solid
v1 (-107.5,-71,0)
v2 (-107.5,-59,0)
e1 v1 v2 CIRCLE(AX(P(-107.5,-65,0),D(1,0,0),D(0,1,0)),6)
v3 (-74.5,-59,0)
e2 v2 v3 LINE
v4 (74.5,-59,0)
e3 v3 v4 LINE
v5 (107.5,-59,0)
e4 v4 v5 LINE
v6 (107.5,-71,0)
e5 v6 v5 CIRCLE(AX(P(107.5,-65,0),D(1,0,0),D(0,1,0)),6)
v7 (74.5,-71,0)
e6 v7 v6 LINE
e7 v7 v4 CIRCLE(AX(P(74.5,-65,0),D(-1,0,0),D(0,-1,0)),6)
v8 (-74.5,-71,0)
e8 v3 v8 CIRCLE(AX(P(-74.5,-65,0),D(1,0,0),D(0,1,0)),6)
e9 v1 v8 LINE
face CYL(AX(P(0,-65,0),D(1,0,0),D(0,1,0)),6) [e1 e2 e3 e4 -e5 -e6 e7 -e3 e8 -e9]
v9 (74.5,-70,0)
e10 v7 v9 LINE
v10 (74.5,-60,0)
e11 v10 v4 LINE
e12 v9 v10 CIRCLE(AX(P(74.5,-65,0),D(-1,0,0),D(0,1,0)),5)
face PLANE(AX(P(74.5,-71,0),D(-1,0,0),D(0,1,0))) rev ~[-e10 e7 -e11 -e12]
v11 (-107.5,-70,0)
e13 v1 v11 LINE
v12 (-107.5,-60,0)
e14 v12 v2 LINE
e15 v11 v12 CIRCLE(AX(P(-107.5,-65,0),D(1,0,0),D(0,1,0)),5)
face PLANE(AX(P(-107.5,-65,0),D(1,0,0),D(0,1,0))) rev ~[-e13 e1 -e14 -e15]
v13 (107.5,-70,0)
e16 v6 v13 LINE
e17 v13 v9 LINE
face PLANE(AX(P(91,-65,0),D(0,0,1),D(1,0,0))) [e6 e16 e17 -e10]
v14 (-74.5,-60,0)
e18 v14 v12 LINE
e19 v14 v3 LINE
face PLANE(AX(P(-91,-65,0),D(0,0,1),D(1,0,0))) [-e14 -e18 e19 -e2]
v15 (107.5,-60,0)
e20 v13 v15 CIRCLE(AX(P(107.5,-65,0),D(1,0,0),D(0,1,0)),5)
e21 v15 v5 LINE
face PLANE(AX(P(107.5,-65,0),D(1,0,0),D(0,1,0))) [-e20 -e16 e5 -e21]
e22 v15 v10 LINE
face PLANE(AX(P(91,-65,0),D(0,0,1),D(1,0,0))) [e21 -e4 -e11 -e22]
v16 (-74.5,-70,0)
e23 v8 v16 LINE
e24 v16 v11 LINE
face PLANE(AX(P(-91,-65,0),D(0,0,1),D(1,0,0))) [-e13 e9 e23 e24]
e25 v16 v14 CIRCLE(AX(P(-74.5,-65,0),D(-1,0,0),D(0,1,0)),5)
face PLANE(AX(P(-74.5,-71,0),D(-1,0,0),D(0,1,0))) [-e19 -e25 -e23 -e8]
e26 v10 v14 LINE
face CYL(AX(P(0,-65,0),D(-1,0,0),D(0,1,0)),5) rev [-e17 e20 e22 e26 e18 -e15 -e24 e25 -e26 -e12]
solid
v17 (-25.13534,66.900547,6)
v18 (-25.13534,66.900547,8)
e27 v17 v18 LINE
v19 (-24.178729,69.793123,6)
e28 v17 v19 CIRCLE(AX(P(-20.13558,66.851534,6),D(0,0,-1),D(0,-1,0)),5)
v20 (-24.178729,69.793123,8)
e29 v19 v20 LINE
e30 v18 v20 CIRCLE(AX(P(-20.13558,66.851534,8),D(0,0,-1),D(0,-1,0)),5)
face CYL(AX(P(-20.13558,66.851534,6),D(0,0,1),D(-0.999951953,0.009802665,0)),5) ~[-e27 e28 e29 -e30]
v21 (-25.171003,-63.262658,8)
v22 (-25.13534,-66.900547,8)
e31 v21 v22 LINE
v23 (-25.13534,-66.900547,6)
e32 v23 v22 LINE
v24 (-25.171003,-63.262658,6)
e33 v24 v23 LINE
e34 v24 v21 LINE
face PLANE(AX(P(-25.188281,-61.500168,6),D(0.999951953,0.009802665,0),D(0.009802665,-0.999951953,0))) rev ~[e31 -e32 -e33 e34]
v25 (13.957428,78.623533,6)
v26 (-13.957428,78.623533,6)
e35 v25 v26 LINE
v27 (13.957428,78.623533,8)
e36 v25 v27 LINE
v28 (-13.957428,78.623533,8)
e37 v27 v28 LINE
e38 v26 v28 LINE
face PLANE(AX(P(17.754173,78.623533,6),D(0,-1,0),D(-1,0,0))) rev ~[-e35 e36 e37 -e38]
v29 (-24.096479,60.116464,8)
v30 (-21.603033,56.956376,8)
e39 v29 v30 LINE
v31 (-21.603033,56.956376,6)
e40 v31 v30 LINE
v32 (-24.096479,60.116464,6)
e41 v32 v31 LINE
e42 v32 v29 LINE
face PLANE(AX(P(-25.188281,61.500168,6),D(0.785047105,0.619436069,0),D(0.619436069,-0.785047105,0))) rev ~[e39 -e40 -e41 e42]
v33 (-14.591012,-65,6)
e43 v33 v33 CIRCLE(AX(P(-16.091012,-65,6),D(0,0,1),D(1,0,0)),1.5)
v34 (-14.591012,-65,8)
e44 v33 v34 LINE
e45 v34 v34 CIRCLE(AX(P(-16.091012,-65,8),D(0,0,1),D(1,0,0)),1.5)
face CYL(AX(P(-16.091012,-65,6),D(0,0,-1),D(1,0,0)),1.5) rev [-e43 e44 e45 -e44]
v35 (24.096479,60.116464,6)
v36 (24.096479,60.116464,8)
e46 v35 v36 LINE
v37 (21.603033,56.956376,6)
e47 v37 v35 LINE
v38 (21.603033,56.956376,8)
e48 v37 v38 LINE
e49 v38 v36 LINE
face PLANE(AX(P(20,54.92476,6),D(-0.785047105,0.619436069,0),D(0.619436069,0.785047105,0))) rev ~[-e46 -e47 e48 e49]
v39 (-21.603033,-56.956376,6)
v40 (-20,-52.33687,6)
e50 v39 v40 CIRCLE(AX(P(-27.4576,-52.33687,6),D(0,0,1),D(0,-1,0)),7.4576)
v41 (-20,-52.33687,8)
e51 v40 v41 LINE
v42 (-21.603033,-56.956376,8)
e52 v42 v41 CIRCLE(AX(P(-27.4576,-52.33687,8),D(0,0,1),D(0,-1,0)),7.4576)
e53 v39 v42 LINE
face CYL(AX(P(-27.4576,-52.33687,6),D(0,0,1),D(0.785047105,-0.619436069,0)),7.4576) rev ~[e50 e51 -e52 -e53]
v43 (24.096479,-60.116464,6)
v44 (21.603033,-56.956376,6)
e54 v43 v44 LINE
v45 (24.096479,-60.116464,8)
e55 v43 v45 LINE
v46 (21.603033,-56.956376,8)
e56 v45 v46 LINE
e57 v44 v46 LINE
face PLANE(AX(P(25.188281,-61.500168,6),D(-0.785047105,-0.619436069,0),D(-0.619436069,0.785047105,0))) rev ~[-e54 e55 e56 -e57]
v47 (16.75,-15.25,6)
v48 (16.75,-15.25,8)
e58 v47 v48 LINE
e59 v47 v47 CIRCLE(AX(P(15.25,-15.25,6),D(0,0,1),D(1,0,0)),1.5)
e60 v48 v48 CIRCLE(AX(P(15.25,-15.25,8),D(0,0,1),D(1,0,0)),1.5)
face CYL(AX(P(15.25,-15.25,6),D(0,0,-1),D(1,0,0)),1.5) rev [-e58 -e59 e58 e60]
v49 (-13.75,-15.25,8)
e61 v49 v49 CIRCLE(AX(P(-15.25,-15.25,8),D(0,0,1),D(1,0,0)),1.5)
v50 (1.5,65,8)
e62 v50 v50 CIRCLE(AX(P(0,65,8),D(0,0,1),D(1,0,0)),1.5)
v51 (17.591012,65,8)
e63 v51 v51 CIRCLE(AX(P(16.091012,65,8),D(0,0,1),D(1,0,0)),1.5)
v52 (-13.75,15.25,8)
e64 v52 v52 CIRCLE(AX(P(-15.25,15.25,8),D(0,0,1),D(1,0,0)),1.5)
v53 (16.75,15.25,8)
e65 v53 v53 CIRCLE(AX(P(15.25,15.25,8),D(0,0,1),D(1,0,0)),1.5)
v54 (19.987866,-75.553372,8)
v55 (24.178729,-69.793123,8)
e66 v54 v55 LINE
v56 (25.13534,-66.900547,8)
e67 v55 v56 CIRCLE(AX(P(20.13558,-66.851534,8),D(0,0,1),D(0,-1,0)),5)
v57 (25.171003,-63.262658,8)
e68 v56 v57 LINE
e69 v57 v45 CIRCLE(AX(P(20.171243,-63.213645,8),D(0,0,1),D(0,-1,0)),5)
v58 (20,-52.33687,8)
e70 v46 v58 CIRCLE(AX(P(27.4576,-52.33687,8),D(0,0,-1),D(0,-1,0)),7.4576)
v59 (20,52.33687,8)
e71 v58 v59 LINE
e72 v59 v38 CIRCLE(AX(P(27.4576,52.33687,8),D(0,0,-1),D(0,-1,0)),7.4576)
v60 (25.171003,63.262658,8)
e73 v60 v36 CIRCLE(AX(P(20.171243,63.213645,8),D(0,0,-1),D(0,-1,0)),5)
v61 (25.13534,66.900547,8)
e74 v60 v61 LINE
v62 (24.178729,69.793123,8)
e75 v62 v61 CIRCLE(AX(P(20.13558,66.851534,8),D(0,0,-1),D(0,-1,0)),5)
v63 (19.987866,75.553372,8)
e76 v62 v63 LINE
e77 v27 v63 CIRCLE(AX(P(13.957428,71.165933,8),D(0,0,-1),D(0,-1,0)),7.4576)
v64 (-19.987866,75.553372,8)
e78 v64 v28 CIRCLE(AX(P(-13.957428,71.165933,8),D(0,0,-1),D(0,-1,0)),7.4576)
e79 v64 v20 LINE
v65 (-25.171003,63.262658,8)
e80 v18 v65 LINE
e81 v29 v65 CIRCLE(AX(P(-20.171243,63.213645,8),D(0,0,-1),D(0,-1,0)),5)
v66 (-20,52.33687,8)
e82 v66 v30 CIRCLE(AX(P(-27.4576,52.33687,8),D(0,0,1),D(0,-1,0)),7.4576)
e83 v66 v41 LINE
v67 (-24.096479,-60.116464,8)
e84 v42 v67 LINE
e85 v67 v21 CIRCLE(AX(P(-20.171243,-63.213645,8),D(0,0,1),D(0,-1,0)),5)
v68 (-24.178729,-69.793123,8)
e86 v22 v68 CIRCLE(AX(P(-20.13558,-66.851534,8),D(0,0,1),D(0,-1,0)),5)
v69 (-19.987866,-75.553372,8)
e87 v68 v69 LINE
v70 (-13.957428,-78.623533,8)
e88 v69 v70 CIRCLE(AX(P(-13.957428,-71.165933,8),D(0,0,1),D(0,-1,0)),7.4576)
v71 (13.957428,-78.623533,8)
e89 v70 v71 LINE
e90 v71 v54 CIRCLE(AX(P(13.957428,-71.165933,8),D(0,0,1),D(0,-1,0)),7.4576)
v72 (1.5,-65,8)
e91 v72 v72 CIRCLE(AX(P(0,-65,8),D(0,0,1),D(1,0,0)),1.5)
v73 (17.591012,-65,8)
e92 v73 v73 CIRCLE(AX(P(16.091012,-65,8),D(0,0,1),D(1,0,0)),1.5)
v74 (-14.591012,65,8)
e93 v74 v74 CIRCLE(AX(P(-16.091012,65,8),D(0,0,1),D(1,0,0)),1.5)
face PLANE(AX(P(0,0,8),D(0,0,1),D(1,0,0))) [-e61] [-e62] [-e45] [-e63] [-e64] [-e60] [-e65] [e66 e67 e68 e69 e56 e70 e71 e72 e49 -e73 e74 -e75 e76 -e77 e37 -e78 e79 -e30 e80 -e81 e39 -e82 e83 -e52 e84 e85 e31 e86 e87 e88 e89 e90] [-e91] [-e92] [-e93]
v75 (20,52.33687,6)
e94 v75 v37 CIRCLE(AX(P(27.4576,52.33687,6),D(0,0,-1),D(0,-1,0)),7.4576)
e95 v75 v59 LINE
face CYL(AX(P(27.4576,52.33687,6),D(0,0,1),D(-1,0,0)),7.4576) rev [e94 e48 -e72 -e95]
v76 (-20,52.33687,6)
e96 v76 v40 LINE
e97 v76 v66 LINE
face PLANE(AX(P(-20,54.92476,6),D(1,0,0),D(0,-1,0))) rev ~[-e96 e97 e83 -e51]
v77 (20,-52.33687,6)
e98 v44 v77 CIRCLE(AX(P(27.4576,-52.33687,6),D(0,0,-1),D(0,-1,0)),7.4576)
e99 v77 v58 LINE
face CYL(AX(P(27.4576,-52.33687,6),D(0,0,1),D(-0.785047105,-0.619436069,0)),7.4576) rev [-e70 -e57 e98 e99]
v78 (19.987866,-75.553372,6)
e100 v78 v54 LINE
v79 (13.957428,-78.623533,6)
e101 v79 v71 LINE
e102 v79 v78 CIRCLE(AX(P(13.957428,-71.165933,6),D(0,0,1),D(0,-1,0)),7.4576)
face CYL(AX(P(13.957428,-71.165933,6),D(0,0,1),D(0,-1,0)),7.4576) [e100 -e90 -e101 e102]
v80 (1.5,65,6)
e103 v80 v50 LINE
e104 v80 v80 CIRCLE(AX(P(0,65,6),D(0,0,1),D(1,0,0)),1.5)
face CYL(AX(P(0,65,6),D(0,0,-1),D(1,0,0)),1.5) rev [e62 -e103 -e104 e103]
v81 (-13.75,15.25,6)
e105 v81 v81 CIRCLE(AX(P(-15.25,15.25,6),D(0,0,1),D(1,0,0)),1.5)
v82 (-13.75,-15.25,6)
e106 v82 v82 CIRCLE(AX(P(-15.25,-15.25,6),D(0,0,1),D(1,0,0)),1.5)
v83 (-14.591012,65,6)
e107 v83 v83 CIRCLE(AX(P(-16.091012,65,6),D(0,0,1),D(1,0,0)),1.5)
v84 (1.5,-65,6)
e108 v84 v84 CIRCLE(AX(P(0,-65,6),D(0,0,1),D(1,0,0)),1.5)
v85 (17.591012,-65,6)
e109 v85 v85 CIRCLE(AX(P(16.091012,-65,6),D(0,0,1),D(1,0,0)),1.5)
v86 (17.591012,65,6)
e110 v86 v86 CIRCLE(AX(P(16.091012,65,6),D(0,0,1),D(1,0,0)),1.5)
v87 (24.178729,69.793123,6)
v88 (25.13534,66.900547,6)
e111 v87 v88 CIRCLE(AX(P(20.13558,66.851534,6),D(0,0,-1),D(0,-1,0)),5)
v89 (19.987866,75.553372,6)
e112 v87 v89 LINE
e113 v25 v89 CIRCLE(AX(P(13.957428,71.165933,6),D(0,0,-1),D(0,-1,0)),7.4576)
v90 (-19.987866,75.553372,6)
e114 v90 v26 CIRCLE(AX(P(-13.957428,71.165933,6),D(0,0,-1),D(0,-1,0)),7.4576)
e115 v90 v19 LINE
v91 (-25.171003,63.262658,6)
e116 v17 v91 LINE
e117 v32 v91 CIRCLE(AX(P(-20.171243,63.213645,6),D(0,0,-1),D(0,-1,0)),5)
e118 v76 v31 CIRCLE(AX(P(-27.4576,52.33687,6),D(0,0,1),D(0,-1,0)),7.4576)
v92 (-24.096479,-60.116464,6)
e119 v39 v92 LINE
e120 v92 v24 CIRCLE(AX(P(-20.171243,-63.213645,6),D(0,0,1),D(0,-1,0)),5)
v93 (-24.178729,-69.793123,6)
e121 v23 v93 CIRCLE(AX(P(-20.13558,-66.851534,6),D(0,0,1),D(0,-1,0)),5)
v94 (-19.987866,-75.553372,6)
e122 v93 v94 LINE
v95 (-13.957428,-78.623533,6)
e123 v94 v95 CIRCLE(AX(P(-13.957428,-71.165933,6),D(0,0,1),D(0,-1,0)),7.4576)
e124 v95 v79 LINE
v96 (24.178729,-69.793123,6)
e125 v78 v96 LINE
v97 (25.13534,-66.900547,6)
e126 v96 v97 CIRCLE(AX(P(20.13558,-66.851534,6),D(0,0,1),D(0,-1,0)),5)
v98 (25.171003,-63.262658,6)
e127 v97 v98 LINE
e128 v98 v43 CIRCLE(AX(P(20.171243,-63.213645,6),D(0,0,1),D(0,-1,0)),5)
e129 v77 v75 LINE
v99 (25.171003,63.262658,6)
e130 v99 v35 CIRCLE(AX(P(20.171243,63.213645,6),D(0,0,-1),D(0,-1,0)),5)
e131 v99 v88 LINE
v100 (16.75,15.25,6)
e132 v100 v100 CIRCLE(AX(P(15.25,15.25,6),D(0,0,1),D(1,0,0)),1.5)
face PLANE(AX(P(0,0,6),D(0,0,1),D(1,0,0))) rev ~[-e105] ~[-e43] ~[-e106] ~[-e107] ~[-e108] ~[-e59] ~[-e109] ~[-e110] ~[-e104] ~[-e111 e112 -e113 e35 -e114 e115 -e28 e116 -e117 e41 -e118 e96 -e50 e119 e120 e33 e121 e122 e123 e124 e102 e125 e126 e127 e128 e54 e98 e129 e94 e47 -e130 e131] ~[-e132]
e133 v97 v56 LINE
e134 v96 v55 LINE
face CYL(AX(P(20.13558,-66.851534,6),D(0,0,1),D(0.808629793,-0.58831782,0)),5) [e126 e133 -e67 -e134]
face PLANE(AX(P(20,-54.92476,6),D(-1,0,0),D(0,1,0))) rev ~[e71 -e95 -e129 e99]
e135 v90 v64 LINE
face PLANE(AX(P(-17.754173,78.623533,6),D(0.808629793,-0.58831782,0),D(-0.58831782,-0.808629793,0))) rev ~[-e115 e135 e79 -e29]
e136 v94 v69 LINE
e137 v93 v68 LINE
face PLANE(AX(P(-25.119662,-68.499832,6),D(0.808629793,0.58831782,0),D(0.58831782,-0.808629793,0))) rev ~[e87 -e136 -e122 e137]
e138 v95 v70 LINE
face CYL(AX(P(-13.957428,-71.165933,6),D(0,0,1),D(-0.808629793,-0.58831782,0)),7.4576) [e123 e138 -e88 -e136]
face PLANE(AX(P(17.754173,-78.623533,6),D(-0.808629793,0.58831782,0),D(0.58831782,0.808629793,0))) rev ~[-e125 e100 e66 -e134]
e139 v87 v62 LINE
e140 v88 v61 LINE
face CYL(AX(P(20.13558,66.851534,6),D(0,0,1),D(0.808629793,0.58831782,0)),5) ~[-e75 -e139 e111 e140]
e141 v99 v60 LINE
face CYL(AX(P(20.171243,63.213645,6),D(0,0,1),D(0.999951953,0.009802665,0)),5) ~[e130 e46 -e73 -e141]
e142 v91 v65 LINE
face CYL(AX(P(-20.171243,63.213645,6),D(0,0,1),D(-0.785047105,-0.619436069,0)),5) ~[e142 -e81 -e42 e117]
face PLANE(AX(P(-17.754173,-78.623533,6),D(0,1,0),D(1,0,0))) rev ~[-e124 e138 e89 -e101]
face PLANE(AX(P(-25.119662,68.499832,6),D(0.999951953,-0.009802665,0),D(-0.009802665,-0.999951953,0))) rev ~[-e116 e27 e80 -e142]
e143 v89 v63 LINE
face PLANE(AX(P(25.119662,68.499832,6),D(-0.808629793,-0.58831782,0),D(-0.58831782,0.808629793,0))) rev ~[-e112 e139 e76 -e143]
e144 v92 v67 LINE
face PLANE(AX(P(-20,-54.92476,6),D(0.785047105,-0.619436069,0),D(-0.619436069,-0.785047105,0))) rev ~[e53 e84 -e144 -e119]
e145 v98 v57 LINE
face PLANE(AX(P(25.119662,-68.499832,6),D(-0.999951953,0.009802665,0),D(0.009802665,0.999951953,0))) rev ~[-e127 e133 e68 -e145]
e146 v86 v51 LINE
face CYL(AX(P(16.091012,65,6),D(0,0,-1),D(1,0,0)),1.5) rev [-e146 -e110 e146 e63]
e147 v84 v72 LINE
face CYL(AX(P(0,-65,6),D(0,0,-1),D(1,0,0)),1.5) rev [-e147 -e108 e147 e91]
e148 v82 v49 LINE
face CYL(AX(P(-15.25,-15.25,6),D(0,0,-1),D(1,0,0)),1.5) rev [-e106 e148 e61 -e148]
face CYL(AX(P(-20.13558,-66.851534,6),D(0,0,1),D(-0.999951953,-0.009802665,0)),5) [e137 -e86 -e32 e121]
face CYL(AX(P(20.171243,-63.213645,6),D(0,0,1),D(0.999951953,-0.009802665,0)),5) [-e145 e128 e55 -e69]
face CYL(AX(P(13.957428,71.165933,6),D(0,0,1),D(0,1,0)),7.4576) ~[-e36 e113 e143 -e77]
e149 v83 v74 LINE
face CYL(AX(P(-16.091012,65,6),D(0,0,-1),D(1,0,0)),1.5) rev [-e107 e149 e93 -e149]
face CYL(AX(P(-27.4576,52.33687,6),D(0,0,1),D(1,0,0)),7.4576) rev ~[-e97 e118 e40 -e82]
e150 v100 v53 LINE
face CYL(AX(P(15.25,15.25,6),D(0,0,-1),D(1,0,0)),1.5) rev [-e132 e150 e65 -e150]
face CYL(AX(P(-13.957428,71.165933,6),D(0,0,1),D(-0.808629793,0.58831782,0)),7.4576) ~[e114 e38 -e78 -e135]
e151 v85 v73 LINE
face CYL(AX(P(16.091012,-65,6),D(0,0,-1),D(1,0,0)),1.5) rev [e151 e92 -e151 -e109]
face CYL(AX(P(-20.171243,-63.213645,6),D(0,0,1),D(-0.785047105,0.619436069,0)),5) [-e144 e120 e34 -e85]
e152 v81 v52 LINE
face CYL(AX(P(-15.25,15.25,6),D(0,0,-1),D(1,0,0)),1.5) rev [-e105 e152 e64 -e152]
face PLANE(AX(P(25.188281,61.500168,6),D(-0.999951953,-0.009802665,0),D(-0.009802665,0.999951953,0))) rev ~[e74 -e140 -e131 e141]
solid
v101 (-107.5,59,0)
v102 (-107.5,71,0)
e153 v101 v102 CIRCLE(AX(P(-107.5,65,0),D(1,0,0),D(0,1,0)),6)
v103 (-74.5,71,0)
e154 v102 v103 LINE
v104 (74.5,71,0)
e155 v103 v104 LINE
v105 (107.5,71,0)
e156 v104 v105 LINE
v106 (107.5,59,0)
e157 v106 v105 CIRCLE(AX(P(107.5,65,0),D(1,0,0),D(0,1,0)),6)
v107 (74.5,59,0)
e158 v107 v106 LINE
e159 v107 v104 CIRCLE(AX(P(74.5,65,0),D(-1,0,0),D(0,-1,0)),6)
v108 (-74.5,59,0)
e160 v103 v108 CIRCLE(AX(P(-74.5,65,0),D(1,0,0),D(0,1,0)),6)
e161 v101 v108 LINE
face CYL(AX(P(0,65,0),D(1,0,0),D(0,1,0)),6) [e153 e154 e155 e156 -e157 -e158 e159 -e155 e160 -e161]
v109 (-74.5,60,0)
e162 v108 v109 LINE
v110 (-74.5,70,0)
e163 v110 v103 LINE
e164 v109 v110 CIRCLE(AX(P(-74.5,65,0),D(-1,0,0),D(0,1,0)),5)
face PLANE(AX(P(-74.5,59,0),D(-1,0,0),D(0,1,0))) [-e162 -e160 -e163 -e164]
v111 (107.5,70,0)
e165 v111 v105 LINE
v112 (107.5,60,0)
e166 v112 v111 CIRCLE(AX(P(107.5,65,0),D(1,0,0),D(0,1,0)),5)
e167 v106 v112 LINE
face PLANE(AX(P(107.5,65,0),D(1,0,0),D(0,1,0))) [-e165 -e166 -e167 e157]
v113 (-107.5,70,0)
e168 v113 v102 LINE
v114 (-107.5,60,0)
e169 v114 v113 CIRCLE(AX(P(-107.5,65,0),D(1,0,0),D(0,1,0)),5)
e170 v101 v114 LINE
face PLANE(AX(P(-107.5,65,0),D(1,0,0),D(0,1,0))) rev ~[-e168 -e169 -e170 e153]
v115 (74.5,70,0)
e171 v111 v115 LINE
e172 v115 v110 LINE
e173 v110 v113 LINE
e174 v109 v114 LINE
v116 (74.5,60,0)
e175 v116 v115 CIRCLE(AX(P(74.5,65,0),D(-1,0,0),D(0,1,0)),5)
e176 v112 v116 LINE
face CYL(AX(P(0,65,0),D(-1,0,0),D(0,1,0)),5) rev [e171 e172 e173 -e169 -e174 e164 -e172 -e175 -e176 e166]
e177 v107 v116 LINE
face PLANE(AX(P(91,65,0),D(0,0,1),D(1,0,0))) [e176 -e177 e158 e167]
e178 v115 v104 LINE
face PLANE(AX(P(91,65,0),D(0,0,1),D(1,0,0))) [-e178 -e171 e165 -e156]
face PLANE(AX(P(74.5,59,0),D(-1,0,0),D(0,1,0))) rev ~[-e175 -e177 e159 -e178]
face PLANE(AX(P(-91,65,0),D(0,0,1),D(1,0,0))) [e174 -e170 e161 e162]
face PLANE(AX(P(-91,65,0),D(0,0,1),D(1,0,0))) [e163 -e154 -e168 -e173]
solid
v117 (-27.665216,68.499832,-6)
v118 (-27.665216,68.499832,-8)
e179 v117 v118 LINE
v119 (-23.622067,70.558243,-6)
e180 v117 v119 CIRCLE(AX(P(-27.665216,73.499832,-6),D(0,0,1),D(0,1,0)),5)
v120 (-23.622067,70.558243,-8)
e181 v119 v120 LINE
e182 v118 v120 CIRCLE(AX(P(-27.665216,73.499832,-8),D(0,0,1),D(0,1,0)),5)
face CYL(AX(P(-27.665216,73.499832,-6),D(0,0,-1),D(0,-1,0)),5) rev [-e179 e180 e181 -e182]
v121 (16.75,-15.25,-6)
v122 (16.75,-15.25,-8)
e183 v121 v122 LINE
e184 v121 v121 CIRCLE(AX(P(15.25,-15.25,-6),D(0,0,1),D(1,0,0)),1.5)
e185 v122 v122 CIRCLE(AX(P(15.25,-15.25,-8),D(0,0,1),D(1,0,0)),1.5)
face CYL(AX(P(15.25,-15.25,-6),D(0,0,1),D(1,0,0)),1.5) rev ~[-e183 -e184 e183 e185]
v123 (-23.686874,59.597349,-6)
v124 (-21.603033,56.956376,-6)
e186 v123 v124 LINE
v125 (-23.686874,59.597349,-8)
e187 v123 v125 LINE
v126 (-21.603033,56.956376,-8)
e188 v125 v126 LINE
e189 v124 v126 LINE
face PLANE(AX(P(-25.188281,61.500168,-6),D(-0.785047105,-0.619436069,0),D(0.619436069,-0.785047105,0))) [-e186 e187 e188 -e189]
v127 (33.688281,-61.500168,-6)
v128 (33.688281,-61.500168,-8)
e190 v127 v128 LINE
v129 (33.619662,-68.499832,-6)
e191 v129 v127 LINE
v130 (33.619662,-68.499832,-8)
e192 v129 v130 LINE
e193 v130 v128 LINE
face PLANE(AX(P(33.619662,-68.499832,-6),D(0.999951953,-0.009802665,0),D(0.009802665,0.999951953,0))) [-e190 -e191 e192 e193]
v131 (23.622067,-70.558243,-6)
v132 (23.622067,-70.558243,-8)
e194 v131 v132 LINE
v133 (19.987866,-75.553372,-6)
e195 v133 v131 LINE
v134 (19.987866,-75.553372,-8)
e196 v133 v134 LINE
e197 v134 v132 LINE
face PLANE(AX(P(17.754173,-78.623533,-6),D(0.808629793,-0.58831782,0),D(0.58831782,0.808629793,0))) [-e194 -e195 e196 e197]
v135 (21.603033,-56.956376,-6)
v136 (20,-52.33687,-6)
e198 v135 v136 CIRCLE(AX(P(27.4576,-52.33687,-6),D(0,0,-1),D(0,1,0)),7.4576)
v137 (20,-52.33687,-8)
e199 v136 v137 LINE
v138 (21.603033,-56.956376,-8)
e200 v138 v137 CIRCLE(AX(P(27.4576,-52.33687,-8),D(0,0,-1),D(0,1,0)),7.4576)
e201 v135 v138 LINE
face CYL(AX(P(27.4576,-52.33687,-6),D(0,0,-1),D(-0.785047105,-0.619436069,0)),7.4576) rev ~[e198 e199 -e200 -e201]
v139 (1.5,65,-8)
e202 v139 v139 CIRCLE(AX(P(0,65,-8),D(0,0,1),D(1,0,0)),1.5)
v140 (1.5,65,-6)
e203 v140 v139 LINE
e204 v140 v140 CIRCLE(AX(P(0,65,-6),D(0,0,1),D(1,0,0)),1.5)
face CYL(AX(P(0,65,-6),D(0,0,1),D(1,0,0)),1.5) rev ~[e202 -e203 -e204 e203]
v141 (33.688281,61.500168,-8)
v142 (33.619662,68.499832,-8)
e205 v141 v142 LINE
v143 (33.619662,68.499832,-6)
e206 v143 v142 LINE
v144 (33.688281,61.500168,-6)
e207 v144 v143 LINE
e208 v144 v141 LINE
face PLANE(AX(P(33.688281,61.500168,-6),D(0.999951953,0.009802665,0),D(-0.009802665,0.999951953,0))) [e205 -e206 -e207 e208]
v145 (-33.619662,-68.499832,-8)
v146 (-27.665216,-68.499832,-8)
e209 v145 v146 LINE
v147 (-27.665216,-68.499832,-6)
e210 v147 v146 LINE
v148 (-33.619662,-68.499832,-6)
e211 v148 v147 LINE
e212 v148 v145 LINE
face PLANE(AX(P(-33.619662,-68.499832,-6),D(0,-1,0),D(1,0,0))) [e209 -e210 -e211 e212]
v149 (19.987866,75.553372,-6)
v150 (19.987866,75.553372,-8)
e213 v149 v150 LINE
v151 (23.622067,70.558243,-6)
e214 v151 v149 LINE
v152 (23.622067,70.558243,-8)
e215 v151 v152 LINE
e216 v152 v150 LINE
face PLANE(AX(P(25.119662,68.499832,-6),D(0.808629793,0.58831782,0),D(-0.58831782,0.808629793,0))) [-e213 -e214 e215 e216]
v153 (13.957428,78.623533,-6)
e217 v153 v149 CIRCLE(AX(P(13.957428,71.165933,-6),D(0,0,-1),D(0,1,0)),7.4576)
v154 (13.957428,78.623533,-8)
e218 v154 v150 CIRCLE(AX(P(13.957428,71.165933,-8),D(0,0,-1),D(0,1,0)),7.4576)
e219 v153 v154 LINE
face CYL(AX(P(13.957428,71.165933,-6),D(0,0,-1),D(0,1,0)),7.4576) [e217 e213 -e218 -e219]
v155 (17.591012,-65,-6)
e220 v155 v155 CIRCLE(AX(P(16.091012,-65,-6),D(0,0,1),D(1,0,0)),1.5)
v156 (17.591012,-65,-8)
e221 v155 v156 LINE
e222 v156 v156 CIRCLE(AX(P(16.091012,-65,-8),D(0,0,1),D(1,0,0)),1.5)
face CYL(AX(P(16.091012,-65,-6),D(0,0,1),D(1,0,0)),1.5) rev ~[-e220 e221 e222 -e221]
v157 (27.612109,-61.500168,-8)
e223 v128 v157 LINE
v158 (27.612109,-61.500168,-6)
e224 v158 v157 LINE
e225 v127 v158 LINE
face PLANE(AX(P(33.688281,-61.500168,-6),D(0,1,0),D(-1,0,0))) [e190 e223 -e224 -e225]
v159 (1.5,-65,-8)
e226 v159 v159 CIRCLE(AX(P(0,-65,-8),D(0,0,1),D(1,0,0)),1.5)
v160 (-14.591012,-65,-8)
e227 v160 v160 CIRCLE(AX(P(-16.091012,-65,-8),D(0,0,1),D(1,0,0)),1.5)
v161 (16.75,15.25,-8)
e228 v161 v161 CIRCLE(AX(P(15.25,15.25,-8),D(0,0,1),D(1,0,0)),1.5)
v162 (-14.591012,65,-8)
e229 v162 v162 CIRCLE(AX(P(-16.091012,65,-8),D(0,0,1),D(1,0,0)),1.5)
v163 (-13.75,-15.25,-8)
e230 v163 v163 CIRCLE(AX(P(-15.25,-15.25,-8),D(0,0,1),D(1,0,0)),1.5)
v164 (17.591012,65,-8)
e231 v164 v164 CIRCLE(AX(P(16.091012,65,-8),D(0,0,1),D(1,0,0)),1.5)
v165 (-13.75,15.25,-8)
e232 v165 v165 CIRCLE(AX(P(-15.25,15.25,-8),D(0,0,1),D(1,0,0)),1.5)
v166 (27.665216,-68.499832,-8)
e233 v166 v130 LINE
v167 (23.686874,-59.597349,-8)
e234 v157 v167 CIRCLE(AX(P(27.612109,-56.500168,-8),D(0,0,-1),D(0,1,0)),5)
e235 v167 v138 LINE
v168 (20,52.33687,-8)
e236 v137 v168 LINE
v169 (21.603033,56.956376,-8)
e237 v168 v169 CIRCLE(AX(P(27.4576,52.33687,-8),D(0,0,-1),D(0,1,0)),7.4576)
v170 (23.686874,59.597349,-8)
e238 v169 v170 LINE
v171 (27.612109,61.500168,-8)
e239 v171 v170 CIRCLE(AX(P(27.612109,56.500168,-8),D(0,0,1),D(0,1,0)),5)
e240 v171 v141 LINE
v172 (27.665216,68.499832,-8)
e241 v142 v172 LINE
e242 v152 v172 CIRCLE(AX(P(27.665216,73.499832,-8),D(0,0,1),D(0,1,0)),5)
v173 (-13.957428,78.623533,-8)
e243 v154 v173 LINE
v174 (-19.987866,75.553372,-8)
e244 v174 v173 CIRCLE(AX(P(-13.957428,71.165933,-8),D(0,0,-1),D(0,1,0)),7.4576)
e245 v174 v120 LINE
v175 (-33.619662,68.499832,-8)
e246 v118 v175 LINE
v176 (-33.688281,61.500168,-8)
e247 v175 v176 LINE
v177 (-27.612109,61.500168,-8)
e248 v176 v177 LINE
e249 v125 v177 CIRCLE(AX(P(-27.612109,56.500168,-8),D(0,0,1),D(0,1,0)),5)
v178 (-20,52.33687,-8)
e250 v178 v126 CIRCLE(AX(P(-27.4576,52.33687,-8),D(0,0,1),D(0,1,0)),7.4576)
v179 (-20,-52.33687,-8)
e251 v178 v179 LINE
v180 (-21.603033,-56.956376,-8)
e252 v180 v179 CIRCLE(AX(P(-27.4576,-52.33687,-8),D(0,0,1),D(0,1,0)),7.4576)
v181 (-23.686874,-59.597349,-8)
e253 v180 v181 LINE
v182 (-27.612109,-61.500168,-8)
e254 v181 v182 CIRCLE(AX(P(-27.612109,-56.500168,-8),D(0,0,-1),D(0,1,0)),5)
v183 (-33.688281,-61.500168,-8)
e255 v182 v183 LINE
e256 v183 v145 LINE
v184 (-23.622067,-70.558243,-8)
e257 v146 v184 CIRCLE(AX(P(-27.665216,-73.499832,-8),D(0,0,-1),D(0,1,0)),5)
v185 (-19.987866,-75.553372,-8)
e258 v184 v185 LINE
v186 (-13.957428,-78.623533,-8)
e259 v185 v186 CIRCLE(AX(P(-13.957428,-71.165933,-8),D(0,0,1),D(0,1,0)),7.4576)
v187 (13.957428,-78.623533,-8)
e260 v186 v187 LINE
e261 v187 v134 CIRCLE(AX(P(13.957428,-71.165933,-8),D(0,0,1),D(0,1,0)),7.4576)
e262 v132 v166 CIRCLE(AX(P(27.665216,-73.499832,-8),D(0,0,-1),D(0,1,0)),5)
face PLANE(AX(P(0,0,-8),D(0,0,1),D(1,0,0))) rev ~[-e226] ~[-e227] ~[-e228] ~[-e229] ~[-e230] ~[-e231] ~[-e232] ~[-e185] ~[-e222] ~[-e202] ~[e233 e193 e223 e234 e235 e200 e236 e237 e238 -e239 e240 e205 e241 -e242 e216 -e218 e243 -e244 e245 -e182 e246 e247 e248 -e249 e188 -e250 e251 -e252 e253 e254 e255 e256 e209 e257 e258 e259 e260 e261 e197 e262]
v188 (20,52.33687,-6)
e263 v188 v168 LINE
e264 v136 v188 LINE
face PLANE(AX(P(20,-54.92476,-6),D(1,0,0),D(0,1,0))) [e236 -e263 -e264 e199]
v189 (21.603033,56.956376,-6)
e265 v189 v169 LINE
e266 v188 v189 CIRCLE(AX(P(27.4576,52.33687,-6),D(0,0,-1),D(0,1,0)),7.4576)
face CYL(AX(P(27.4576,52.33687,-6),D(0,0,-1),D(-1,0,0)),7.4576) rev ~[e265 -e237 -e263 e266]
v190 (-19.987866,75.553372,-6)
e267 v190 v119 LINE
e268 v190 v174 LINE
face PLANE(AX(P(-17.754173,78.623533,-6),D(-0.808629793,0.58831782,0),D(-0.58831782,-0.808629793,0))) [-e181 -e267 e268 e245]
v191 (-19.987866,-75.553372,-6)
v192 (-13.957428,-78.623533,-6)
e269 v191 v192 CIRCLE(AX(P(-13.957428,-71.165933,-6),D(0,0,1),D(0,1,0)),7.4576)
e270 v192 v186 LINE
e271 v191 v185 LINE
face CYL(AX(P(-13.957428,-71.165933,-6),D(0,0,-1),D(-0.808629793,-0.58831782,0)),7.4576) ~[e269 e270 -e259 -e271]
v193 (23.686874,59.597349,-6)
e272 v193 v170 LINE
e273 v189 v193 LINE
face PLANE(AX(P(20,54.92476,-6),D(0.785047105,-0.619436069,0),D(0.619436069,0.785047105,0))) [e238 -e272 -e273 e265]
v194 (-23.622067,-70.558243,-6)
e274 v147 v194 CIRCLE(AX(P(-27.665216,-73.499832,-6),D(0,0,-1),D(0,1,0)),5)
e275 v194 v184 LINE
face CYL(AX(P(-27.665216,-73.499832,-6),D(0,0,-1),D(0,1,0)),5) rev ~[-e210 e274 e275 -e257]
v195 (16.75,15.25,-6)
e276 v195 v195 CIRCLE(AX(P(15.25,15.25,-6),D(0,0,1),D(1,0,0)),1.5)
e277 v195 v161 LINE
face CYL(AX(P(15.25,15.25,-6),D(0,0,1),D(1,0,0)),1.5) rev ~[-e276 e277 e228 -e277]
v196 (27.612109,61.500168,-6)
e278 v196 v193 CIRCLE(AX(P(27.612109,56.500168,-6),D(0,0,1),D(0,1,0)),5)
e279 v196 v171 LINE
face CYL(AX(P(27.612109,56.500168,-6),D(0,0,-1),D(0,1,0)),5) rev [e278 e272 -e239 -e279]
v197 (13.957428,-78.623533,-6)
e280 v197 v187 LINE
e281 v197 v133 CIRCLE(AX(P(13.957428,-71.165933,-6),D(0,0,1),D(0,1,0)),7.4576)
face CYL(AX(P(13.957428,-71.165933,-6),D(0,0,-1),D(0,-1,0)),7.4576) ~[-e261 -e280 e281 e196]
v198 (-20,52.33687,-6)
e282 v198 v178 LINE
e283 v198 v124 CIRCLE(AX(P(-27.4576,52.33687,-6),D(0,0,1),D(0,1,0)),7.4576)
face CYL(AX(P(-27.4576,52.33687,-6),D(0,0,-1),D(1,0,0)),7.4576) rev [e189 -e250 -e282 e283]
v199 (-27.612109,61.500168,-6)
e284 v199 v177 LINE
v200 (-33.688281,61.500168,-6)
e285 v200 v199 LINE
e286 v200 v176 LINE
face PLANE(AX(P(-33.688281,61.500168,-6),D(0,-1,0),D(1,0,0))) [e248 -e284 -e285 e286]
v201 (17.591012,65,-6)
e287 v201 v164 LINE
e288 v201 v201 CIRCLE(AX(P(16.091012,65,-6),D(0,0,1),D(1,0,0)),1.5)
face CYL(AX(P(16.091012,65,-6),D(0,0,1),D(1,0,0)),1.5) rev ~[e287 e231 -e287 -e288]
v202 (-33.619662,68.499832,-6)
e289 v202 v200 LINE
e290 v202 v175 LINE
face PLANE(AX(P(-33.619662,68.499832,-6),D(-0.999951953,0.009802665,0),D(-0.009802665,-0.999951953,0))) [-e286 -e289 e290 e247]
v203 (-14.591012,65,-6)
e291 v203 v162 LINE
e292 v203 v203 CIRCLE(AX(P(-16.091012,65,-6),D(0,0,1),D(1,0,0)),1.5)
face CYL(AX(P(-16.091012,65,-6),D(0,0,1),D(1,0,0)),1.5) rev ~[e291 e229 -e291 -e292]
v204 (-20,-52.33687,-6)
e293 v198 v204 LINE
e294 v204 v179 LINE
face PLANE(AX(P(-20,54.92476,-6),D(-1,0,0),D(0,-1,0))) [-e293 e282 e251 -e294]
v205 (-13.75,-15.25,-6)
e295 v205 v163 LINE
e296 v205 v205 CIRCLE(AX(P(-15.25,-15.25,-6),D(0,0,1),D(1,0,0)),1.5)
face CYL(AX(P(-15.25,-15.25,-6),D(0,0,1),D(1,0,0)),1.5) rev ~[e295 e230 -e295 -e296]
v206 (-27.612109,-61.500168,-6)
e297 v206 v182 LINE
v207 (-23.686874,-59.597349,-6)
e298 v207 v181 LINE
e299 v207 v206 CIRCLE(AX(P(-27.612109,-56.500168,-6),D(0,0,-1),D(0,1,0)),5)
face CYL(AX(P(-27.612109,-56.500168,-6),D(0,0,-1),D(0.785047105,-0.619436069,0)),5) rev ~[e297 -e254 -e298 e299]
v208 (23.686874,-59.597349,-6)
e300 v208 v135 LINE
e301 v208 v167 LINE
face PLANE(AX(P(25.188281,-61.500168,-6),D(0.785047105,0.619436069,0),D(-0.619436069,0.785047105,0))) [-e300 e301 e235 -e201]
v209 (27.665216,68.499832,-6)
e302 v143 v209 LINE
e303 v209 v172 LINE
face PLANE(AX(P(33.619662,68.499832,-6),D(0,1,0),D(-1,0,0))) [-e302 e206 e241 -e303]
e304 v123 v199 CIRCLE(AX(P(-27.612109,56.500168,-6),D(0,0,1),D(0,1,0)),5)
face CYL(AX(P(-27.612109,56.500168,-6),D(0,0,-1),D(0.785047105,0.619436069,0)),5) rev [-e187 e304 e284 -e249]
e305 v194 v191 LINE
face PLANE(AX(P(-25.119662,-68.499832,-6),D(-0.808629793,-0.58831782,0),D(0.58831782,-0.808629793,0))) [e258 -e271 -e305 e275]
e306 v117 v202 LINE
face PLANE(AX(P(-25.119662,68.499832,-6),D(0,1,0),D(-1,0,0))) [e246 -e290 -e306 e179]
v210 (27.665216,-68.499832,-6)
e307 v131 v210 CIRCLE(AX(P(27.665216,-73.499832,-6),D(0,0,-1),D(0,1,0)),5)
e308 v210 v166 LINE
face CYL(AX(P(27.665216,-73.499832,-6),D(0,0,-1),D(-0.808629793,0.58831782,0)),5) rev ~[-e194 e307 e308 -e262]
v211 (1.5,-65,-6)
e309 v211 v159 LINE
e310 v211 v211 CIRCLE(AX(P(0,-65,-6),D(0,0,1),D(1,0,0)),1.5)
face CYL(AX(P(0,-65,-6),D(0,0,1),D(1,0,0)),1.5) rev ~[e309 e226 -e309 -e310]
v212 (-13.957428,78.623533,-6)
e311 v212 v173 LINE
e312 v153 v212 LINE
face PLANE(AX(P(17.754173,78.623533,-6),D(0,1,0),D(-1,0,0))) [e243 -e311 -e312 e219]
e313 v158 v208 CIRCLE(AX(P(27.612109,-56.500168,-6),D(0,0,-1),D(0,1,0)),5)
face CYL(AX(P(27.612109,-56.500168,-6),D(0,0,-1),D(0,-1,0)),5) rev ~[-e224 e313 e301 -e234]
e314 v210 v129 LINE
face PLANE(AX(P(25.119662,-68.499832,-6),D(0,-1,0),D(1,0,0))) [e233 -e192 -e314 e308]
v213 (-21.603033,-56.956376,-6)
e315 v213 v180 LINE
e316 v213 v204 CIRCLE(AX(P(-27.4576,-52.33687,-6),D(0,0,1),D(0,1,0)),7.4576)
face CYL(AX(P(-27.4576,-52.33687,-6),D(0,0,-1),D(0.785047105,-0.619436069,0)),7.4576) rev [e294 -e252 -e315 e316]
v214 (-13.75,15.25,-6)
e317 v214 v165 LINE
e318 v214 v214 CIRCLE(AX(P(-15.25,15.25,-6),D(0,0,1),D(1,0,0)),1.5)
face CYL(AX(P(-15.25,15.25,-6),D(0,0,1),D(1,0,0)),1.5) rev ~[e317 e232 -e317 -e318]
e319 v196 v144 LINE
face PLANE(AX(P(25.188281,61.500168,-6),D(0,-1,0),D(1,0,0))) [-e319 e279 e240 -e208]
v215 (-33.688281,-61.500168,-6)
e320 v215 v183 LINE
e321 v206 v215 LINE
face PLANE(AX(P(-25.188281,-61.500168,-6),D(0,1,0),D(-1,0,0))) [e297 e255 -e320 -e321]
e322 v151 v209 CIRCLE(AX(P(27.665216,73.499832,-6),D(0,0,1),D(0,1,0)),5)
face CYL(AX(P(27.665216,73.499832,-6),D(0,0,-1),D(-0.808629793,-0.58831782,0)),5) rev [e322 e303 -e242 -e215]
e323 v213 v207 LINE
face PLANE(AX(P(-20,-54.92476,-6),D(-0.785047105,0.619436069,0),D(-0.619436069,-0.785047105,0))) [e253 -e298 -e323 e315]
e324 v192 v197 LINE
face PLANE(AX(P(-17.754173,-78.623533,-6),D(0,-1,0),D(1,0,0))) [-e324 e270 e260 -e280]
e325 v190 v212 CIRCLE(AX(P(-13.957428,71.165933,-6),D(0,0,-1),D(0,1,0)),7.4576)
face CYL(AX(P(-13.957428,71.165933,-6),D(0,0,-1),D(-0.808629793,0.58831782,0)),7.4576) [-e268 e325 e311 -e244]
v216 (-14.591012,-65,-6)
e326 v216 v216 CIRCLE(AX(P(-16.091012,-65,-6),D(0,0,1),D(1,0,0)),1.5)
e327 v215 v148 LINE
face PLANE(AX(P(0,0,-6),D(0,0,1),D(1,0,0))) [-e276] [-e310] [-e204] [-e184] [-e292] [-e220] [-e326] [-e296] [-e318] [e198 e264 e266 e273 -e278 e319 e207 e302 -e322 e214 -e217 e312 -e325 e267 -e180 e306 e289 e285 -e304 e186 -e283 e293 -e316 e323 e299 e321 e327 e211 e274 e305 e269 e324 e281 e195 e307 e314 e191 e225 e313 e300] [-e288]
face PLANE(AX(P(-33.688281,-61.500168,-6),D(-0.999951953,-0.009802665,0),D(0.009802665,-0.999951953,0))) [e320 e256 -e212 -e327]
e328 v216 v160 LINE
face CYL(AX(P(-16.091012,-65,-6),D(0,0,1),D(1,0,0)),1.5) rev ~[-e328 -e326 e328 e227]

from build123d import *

# Parameters (mm, degrees)
F1_R     = 6
F1_R_2   = 5
F2_DEPTH = 107.5
F4_START = -6
F3_R     = 1.5
F4_DEPTH = 2
F6_START = 6
F5_R     = 1.5
F6_DEPTH = 2
F7_W     = 33
F7_H     = 12
F8_DEPTH = 6
F9_R     = 5
F9_2_R   = 5
F10_R    = 7.4575999994
F10_2_R  = 7.4575999994


with BuildPart() as f2:
    # F1 (on Right) → F2 (new body, symmetric)
    with BuildSketch(Plane.YZ):
        with Locations((-65, 0)):
            Circle(F1_R)
        with Locations((-65, 0)):
            Circle(F1_R_2, mode=Mode.SUBTRACT)
    extrude(amount=F2_DEPTH, both=True)


with BuildPart() as f2b:
    # F1 (on Right) → F2, piece 2 (new body, symmetric)
    with BuildSketch(Plane.YZ):
        with Locations((65, 0)):
            Circle(F1_R)
        with Locations((65, 0)):
            Circle(F1_R_2, mode=Mode.SUBTRACT)
    extrude(amount=F2_DEPTH, both=True)


with BuildPart() as f4:
    # F3 (on Top) → F4 (new body)
    with BuildSketch(Plane.XY.offset(F4_START)):
        Polygon((-20, 0), (-20, -54.9247604212), (-25.1882806771, -61.5001681654), (-33.6882806771, -61.5001681654), (-33.6196620251, -68.4998318346), (-25.1196620251, -68.4998318346), (-17.7541729063, -78.6235332489), (0, -78.6235332489), (17.7541729063, -78.6235332489), (25.1196620251, -68.4998318346), (33.6196620251, -68.4998318346), (33.6882806771, -61.5001681654), (25.1882806771, -61.5001681654), (20, -54.9247604212), (20, 0), (20, 54.9247604212), (25.1882806771, 61.5001681654), (33.6882806771, 61.5001681654), (33.6196620251, 68.4998318346), (25.1196620251, 68.4998318346), (17.7541729063, 78.6235332489), (0, 78.6235332489), (-17.7541729063, 78.6235332489), (-25.1196620251, 68.4998318346), (-33.6196620251, 68.4998318346), (-33.6882806771, 61.5001681654), (-25.1882806771, 61.5001681654), (-20, 54.9247604212), align=None)
        with Locations((-16.0910124415, -65)):
            Circle(F3_R, mode=Mode.SUBTRACT)
        with Locations((-15.25, -15.25)):
            Circle(F3_R, mode=Mode.SUBTRACT)
        with Locations((0, -65)):
            Circle(F3_R, mode=Mode.SUBTRACT)
        with Locations((16.0910124415, -65)):
            Circle(F3_R, mode=Mode.SUBTRACT)
        with Locations((15.25, -15.25)):
            Circle(F3_R, mode=Mode.SUBTRACT)
        with Locations((-15.25, 15.25)):
            Circle(F3_R, mode=Mode.SUBTRACT)
        with Locations((-16.0910124415, 65)):
            Circle(F3_R, mode=Mode.SUBTRACT)
        with Locations((15.25, 15.25)):
            Circle(F3_R, mode=Mode.SUBTRACT)
        with Locations((0, 65)):
            Circle(F3_R, mode=Mode.SUBTRACT)
        with Locations((16.0910124415, 65)):
            Circle(F3_R, mode=Mode.SUBTRACT)
    extrude(amount=-F4_DEPTH)

    # F9
    f9_edges = [f4.edges().sort_by_distance(p)[0] for p in [
        (-25.119662, -68.499832, -7),
        (25.119662, -68.499832, -7),
        (25.188281, -61.500168, -7),
        (-25.188281, -61.500168, -7),
        (-25.119662, 68.499832, -7),
        (25.119662, 68.499832, -7),
        (25.188281, 61.500168, -7),
        (-25.188281, 61.500168, -7),
    ]]
    fillet(f9_edges, radius=F9_R)

    # F10
    f10_edges = [f4.edges().sort_by_distance(p)[0] for p in [
        (17.754173, 78.623533, -7),
        (-17.754173, 78.623533, -7),
        (-20, 54.92476, -7),
        (20, 54.92476, -7),
        (20, -54.92476, -7),
        (17.754173, -78.623533, -7),
        (-17.754173, -78.623533, -7),
        (-20, -54.92476, -7),
    ]]
    fillet(f10_edges, radius=F10_R)


with BuildPart() as f6:
    # F5 (on Top) → F6 (new body)
    with BuildSketch(Plane.XY.offset(F6_START)):
        Polygon((-20, 0), (-20, -54.9247604212), (-25.1882806771, -61.5001681654), (-25.1196620251, -68.4998318346), (-17.7541729063, -78.6235332489), (0, -78.6235332489), (17.7541729063, -78.6235332489), (25.1196620251, -68.4998318346), (25.1882806771, -61.5001681654), (20, -54.9247604212), (20, 0), (20, 54.9247604212), (25.1882806771, 61.5001681654), (25.1196620251, 68.4998318346), (17.7541729063, 78.6235332489), (0, 78.6235332489), (-17.7541729063, 78.6235332489), (-25.1196620251, 68.4998318346), (-25.1882806771, 61.5001681654), (-20, 54.9247604212), align=None)
        with Locations((-16.0910124415, -65)):
            Circle(F5_R, mode=Mode.SUBTRACT)
        with Locations((-15.25, -15.25)):
            Circle(F5_R, mode=Mode.SUBTRACT)
        with Locations((0, -65)):
            Circle(F5_R, mode=Mode.SUBTRACT)
        with Locations((16.0910124415, -65)):
            Circle(F5_R, mode=Mode.SUBTRACT)
        with Locations((15.25, -15.25)):
            Circle(F5_R, mode=Mode.SUBTRACT)
        with Locations((-15.25, 15.25)):
            Circle(F5_R, mode=Mode.SUBTRACT)
        with Locations((-16.0910124415, 65)):
            Circle(F5_R, mode=Mode.SUBTRACT)
        with Locations((15.25, 15.25)):
            Circle(F5_R, mode=Mode.SUBTRACT)
        with Locations((0, 65)):
            Circle(F5_R, mode=Mode.SUBTRACT)
        with Locations((16.0910124415, 65)):
            Circle(F5_R, mode=Mode.SUBTRACT)
    extrude(amount=F6_DEPTH)

    # F9#2
    f9_2_edges = [f6.edges().sort_by_distance(p)[0] for p in [
        (-25.119662, 68.499832, 7),
        (-25.188281, 61.500168, 7),
        (25.119662, 68.499832, 7),
        (25.188281, 61.500168, 7),
        (25.119662, -68.499832, 7),
        (25.188281, -61.500168, 7),
        (-25.188281, -61.500168, 7),
        (-25.119662, -68.499832, 7),
    ]]
    fillet(f9_2_edges, radius=F9_2_R)

    # F10#2
    f10_2_edges = [f6.edges().sort_by_distance(p)[0] for p in [
        (-17.754173, 78.623533, 7),
        (17.754173, 78.623533, 7),
        (20, -54.92476, 7),
        (20, 54.92476, 7),
        (17.754173, -78.623533, 7),
        (-17.754173, -78.623533, 7),
        (-20, -54.92476, 7),
        (-20, 54.92476, 7),
    ]]
    fillet(f10_2_edges, radius=F10_2_R)


with BuildPart() as f8_tool:
    # F7 (on Top) → F8 (new body)
    with BuildSketch(Plane.XY):
        with Locations((91, -65)):
            Rectangle(F7_W, F7_H)
        with Locations((-91, -65)):
            Rectangle(F7_W, F7_H)
        with Locations((91, 65)):
            Rectangle(F7_W, F7_H)
        with Locations((-91, 65)):
            Rectangle(F7_W, F7_H)
    extrude(amount=F8_DEPTH)


with BuildPart() as f2_1:
    add(f2.part)

    # F8: cut by f8_tool
    add(f8_tool.part, mode=Mode.SUBTRACT)


with BuildPart() as f2b_1:
    add(f2b.part)

    # F8: cut by f8_tool
    add(f8_tool.part, mode=Mode.SUBTRACT)


solid = Compound([f4.part, f6.part, f2_1.part, f2b_1.part])
